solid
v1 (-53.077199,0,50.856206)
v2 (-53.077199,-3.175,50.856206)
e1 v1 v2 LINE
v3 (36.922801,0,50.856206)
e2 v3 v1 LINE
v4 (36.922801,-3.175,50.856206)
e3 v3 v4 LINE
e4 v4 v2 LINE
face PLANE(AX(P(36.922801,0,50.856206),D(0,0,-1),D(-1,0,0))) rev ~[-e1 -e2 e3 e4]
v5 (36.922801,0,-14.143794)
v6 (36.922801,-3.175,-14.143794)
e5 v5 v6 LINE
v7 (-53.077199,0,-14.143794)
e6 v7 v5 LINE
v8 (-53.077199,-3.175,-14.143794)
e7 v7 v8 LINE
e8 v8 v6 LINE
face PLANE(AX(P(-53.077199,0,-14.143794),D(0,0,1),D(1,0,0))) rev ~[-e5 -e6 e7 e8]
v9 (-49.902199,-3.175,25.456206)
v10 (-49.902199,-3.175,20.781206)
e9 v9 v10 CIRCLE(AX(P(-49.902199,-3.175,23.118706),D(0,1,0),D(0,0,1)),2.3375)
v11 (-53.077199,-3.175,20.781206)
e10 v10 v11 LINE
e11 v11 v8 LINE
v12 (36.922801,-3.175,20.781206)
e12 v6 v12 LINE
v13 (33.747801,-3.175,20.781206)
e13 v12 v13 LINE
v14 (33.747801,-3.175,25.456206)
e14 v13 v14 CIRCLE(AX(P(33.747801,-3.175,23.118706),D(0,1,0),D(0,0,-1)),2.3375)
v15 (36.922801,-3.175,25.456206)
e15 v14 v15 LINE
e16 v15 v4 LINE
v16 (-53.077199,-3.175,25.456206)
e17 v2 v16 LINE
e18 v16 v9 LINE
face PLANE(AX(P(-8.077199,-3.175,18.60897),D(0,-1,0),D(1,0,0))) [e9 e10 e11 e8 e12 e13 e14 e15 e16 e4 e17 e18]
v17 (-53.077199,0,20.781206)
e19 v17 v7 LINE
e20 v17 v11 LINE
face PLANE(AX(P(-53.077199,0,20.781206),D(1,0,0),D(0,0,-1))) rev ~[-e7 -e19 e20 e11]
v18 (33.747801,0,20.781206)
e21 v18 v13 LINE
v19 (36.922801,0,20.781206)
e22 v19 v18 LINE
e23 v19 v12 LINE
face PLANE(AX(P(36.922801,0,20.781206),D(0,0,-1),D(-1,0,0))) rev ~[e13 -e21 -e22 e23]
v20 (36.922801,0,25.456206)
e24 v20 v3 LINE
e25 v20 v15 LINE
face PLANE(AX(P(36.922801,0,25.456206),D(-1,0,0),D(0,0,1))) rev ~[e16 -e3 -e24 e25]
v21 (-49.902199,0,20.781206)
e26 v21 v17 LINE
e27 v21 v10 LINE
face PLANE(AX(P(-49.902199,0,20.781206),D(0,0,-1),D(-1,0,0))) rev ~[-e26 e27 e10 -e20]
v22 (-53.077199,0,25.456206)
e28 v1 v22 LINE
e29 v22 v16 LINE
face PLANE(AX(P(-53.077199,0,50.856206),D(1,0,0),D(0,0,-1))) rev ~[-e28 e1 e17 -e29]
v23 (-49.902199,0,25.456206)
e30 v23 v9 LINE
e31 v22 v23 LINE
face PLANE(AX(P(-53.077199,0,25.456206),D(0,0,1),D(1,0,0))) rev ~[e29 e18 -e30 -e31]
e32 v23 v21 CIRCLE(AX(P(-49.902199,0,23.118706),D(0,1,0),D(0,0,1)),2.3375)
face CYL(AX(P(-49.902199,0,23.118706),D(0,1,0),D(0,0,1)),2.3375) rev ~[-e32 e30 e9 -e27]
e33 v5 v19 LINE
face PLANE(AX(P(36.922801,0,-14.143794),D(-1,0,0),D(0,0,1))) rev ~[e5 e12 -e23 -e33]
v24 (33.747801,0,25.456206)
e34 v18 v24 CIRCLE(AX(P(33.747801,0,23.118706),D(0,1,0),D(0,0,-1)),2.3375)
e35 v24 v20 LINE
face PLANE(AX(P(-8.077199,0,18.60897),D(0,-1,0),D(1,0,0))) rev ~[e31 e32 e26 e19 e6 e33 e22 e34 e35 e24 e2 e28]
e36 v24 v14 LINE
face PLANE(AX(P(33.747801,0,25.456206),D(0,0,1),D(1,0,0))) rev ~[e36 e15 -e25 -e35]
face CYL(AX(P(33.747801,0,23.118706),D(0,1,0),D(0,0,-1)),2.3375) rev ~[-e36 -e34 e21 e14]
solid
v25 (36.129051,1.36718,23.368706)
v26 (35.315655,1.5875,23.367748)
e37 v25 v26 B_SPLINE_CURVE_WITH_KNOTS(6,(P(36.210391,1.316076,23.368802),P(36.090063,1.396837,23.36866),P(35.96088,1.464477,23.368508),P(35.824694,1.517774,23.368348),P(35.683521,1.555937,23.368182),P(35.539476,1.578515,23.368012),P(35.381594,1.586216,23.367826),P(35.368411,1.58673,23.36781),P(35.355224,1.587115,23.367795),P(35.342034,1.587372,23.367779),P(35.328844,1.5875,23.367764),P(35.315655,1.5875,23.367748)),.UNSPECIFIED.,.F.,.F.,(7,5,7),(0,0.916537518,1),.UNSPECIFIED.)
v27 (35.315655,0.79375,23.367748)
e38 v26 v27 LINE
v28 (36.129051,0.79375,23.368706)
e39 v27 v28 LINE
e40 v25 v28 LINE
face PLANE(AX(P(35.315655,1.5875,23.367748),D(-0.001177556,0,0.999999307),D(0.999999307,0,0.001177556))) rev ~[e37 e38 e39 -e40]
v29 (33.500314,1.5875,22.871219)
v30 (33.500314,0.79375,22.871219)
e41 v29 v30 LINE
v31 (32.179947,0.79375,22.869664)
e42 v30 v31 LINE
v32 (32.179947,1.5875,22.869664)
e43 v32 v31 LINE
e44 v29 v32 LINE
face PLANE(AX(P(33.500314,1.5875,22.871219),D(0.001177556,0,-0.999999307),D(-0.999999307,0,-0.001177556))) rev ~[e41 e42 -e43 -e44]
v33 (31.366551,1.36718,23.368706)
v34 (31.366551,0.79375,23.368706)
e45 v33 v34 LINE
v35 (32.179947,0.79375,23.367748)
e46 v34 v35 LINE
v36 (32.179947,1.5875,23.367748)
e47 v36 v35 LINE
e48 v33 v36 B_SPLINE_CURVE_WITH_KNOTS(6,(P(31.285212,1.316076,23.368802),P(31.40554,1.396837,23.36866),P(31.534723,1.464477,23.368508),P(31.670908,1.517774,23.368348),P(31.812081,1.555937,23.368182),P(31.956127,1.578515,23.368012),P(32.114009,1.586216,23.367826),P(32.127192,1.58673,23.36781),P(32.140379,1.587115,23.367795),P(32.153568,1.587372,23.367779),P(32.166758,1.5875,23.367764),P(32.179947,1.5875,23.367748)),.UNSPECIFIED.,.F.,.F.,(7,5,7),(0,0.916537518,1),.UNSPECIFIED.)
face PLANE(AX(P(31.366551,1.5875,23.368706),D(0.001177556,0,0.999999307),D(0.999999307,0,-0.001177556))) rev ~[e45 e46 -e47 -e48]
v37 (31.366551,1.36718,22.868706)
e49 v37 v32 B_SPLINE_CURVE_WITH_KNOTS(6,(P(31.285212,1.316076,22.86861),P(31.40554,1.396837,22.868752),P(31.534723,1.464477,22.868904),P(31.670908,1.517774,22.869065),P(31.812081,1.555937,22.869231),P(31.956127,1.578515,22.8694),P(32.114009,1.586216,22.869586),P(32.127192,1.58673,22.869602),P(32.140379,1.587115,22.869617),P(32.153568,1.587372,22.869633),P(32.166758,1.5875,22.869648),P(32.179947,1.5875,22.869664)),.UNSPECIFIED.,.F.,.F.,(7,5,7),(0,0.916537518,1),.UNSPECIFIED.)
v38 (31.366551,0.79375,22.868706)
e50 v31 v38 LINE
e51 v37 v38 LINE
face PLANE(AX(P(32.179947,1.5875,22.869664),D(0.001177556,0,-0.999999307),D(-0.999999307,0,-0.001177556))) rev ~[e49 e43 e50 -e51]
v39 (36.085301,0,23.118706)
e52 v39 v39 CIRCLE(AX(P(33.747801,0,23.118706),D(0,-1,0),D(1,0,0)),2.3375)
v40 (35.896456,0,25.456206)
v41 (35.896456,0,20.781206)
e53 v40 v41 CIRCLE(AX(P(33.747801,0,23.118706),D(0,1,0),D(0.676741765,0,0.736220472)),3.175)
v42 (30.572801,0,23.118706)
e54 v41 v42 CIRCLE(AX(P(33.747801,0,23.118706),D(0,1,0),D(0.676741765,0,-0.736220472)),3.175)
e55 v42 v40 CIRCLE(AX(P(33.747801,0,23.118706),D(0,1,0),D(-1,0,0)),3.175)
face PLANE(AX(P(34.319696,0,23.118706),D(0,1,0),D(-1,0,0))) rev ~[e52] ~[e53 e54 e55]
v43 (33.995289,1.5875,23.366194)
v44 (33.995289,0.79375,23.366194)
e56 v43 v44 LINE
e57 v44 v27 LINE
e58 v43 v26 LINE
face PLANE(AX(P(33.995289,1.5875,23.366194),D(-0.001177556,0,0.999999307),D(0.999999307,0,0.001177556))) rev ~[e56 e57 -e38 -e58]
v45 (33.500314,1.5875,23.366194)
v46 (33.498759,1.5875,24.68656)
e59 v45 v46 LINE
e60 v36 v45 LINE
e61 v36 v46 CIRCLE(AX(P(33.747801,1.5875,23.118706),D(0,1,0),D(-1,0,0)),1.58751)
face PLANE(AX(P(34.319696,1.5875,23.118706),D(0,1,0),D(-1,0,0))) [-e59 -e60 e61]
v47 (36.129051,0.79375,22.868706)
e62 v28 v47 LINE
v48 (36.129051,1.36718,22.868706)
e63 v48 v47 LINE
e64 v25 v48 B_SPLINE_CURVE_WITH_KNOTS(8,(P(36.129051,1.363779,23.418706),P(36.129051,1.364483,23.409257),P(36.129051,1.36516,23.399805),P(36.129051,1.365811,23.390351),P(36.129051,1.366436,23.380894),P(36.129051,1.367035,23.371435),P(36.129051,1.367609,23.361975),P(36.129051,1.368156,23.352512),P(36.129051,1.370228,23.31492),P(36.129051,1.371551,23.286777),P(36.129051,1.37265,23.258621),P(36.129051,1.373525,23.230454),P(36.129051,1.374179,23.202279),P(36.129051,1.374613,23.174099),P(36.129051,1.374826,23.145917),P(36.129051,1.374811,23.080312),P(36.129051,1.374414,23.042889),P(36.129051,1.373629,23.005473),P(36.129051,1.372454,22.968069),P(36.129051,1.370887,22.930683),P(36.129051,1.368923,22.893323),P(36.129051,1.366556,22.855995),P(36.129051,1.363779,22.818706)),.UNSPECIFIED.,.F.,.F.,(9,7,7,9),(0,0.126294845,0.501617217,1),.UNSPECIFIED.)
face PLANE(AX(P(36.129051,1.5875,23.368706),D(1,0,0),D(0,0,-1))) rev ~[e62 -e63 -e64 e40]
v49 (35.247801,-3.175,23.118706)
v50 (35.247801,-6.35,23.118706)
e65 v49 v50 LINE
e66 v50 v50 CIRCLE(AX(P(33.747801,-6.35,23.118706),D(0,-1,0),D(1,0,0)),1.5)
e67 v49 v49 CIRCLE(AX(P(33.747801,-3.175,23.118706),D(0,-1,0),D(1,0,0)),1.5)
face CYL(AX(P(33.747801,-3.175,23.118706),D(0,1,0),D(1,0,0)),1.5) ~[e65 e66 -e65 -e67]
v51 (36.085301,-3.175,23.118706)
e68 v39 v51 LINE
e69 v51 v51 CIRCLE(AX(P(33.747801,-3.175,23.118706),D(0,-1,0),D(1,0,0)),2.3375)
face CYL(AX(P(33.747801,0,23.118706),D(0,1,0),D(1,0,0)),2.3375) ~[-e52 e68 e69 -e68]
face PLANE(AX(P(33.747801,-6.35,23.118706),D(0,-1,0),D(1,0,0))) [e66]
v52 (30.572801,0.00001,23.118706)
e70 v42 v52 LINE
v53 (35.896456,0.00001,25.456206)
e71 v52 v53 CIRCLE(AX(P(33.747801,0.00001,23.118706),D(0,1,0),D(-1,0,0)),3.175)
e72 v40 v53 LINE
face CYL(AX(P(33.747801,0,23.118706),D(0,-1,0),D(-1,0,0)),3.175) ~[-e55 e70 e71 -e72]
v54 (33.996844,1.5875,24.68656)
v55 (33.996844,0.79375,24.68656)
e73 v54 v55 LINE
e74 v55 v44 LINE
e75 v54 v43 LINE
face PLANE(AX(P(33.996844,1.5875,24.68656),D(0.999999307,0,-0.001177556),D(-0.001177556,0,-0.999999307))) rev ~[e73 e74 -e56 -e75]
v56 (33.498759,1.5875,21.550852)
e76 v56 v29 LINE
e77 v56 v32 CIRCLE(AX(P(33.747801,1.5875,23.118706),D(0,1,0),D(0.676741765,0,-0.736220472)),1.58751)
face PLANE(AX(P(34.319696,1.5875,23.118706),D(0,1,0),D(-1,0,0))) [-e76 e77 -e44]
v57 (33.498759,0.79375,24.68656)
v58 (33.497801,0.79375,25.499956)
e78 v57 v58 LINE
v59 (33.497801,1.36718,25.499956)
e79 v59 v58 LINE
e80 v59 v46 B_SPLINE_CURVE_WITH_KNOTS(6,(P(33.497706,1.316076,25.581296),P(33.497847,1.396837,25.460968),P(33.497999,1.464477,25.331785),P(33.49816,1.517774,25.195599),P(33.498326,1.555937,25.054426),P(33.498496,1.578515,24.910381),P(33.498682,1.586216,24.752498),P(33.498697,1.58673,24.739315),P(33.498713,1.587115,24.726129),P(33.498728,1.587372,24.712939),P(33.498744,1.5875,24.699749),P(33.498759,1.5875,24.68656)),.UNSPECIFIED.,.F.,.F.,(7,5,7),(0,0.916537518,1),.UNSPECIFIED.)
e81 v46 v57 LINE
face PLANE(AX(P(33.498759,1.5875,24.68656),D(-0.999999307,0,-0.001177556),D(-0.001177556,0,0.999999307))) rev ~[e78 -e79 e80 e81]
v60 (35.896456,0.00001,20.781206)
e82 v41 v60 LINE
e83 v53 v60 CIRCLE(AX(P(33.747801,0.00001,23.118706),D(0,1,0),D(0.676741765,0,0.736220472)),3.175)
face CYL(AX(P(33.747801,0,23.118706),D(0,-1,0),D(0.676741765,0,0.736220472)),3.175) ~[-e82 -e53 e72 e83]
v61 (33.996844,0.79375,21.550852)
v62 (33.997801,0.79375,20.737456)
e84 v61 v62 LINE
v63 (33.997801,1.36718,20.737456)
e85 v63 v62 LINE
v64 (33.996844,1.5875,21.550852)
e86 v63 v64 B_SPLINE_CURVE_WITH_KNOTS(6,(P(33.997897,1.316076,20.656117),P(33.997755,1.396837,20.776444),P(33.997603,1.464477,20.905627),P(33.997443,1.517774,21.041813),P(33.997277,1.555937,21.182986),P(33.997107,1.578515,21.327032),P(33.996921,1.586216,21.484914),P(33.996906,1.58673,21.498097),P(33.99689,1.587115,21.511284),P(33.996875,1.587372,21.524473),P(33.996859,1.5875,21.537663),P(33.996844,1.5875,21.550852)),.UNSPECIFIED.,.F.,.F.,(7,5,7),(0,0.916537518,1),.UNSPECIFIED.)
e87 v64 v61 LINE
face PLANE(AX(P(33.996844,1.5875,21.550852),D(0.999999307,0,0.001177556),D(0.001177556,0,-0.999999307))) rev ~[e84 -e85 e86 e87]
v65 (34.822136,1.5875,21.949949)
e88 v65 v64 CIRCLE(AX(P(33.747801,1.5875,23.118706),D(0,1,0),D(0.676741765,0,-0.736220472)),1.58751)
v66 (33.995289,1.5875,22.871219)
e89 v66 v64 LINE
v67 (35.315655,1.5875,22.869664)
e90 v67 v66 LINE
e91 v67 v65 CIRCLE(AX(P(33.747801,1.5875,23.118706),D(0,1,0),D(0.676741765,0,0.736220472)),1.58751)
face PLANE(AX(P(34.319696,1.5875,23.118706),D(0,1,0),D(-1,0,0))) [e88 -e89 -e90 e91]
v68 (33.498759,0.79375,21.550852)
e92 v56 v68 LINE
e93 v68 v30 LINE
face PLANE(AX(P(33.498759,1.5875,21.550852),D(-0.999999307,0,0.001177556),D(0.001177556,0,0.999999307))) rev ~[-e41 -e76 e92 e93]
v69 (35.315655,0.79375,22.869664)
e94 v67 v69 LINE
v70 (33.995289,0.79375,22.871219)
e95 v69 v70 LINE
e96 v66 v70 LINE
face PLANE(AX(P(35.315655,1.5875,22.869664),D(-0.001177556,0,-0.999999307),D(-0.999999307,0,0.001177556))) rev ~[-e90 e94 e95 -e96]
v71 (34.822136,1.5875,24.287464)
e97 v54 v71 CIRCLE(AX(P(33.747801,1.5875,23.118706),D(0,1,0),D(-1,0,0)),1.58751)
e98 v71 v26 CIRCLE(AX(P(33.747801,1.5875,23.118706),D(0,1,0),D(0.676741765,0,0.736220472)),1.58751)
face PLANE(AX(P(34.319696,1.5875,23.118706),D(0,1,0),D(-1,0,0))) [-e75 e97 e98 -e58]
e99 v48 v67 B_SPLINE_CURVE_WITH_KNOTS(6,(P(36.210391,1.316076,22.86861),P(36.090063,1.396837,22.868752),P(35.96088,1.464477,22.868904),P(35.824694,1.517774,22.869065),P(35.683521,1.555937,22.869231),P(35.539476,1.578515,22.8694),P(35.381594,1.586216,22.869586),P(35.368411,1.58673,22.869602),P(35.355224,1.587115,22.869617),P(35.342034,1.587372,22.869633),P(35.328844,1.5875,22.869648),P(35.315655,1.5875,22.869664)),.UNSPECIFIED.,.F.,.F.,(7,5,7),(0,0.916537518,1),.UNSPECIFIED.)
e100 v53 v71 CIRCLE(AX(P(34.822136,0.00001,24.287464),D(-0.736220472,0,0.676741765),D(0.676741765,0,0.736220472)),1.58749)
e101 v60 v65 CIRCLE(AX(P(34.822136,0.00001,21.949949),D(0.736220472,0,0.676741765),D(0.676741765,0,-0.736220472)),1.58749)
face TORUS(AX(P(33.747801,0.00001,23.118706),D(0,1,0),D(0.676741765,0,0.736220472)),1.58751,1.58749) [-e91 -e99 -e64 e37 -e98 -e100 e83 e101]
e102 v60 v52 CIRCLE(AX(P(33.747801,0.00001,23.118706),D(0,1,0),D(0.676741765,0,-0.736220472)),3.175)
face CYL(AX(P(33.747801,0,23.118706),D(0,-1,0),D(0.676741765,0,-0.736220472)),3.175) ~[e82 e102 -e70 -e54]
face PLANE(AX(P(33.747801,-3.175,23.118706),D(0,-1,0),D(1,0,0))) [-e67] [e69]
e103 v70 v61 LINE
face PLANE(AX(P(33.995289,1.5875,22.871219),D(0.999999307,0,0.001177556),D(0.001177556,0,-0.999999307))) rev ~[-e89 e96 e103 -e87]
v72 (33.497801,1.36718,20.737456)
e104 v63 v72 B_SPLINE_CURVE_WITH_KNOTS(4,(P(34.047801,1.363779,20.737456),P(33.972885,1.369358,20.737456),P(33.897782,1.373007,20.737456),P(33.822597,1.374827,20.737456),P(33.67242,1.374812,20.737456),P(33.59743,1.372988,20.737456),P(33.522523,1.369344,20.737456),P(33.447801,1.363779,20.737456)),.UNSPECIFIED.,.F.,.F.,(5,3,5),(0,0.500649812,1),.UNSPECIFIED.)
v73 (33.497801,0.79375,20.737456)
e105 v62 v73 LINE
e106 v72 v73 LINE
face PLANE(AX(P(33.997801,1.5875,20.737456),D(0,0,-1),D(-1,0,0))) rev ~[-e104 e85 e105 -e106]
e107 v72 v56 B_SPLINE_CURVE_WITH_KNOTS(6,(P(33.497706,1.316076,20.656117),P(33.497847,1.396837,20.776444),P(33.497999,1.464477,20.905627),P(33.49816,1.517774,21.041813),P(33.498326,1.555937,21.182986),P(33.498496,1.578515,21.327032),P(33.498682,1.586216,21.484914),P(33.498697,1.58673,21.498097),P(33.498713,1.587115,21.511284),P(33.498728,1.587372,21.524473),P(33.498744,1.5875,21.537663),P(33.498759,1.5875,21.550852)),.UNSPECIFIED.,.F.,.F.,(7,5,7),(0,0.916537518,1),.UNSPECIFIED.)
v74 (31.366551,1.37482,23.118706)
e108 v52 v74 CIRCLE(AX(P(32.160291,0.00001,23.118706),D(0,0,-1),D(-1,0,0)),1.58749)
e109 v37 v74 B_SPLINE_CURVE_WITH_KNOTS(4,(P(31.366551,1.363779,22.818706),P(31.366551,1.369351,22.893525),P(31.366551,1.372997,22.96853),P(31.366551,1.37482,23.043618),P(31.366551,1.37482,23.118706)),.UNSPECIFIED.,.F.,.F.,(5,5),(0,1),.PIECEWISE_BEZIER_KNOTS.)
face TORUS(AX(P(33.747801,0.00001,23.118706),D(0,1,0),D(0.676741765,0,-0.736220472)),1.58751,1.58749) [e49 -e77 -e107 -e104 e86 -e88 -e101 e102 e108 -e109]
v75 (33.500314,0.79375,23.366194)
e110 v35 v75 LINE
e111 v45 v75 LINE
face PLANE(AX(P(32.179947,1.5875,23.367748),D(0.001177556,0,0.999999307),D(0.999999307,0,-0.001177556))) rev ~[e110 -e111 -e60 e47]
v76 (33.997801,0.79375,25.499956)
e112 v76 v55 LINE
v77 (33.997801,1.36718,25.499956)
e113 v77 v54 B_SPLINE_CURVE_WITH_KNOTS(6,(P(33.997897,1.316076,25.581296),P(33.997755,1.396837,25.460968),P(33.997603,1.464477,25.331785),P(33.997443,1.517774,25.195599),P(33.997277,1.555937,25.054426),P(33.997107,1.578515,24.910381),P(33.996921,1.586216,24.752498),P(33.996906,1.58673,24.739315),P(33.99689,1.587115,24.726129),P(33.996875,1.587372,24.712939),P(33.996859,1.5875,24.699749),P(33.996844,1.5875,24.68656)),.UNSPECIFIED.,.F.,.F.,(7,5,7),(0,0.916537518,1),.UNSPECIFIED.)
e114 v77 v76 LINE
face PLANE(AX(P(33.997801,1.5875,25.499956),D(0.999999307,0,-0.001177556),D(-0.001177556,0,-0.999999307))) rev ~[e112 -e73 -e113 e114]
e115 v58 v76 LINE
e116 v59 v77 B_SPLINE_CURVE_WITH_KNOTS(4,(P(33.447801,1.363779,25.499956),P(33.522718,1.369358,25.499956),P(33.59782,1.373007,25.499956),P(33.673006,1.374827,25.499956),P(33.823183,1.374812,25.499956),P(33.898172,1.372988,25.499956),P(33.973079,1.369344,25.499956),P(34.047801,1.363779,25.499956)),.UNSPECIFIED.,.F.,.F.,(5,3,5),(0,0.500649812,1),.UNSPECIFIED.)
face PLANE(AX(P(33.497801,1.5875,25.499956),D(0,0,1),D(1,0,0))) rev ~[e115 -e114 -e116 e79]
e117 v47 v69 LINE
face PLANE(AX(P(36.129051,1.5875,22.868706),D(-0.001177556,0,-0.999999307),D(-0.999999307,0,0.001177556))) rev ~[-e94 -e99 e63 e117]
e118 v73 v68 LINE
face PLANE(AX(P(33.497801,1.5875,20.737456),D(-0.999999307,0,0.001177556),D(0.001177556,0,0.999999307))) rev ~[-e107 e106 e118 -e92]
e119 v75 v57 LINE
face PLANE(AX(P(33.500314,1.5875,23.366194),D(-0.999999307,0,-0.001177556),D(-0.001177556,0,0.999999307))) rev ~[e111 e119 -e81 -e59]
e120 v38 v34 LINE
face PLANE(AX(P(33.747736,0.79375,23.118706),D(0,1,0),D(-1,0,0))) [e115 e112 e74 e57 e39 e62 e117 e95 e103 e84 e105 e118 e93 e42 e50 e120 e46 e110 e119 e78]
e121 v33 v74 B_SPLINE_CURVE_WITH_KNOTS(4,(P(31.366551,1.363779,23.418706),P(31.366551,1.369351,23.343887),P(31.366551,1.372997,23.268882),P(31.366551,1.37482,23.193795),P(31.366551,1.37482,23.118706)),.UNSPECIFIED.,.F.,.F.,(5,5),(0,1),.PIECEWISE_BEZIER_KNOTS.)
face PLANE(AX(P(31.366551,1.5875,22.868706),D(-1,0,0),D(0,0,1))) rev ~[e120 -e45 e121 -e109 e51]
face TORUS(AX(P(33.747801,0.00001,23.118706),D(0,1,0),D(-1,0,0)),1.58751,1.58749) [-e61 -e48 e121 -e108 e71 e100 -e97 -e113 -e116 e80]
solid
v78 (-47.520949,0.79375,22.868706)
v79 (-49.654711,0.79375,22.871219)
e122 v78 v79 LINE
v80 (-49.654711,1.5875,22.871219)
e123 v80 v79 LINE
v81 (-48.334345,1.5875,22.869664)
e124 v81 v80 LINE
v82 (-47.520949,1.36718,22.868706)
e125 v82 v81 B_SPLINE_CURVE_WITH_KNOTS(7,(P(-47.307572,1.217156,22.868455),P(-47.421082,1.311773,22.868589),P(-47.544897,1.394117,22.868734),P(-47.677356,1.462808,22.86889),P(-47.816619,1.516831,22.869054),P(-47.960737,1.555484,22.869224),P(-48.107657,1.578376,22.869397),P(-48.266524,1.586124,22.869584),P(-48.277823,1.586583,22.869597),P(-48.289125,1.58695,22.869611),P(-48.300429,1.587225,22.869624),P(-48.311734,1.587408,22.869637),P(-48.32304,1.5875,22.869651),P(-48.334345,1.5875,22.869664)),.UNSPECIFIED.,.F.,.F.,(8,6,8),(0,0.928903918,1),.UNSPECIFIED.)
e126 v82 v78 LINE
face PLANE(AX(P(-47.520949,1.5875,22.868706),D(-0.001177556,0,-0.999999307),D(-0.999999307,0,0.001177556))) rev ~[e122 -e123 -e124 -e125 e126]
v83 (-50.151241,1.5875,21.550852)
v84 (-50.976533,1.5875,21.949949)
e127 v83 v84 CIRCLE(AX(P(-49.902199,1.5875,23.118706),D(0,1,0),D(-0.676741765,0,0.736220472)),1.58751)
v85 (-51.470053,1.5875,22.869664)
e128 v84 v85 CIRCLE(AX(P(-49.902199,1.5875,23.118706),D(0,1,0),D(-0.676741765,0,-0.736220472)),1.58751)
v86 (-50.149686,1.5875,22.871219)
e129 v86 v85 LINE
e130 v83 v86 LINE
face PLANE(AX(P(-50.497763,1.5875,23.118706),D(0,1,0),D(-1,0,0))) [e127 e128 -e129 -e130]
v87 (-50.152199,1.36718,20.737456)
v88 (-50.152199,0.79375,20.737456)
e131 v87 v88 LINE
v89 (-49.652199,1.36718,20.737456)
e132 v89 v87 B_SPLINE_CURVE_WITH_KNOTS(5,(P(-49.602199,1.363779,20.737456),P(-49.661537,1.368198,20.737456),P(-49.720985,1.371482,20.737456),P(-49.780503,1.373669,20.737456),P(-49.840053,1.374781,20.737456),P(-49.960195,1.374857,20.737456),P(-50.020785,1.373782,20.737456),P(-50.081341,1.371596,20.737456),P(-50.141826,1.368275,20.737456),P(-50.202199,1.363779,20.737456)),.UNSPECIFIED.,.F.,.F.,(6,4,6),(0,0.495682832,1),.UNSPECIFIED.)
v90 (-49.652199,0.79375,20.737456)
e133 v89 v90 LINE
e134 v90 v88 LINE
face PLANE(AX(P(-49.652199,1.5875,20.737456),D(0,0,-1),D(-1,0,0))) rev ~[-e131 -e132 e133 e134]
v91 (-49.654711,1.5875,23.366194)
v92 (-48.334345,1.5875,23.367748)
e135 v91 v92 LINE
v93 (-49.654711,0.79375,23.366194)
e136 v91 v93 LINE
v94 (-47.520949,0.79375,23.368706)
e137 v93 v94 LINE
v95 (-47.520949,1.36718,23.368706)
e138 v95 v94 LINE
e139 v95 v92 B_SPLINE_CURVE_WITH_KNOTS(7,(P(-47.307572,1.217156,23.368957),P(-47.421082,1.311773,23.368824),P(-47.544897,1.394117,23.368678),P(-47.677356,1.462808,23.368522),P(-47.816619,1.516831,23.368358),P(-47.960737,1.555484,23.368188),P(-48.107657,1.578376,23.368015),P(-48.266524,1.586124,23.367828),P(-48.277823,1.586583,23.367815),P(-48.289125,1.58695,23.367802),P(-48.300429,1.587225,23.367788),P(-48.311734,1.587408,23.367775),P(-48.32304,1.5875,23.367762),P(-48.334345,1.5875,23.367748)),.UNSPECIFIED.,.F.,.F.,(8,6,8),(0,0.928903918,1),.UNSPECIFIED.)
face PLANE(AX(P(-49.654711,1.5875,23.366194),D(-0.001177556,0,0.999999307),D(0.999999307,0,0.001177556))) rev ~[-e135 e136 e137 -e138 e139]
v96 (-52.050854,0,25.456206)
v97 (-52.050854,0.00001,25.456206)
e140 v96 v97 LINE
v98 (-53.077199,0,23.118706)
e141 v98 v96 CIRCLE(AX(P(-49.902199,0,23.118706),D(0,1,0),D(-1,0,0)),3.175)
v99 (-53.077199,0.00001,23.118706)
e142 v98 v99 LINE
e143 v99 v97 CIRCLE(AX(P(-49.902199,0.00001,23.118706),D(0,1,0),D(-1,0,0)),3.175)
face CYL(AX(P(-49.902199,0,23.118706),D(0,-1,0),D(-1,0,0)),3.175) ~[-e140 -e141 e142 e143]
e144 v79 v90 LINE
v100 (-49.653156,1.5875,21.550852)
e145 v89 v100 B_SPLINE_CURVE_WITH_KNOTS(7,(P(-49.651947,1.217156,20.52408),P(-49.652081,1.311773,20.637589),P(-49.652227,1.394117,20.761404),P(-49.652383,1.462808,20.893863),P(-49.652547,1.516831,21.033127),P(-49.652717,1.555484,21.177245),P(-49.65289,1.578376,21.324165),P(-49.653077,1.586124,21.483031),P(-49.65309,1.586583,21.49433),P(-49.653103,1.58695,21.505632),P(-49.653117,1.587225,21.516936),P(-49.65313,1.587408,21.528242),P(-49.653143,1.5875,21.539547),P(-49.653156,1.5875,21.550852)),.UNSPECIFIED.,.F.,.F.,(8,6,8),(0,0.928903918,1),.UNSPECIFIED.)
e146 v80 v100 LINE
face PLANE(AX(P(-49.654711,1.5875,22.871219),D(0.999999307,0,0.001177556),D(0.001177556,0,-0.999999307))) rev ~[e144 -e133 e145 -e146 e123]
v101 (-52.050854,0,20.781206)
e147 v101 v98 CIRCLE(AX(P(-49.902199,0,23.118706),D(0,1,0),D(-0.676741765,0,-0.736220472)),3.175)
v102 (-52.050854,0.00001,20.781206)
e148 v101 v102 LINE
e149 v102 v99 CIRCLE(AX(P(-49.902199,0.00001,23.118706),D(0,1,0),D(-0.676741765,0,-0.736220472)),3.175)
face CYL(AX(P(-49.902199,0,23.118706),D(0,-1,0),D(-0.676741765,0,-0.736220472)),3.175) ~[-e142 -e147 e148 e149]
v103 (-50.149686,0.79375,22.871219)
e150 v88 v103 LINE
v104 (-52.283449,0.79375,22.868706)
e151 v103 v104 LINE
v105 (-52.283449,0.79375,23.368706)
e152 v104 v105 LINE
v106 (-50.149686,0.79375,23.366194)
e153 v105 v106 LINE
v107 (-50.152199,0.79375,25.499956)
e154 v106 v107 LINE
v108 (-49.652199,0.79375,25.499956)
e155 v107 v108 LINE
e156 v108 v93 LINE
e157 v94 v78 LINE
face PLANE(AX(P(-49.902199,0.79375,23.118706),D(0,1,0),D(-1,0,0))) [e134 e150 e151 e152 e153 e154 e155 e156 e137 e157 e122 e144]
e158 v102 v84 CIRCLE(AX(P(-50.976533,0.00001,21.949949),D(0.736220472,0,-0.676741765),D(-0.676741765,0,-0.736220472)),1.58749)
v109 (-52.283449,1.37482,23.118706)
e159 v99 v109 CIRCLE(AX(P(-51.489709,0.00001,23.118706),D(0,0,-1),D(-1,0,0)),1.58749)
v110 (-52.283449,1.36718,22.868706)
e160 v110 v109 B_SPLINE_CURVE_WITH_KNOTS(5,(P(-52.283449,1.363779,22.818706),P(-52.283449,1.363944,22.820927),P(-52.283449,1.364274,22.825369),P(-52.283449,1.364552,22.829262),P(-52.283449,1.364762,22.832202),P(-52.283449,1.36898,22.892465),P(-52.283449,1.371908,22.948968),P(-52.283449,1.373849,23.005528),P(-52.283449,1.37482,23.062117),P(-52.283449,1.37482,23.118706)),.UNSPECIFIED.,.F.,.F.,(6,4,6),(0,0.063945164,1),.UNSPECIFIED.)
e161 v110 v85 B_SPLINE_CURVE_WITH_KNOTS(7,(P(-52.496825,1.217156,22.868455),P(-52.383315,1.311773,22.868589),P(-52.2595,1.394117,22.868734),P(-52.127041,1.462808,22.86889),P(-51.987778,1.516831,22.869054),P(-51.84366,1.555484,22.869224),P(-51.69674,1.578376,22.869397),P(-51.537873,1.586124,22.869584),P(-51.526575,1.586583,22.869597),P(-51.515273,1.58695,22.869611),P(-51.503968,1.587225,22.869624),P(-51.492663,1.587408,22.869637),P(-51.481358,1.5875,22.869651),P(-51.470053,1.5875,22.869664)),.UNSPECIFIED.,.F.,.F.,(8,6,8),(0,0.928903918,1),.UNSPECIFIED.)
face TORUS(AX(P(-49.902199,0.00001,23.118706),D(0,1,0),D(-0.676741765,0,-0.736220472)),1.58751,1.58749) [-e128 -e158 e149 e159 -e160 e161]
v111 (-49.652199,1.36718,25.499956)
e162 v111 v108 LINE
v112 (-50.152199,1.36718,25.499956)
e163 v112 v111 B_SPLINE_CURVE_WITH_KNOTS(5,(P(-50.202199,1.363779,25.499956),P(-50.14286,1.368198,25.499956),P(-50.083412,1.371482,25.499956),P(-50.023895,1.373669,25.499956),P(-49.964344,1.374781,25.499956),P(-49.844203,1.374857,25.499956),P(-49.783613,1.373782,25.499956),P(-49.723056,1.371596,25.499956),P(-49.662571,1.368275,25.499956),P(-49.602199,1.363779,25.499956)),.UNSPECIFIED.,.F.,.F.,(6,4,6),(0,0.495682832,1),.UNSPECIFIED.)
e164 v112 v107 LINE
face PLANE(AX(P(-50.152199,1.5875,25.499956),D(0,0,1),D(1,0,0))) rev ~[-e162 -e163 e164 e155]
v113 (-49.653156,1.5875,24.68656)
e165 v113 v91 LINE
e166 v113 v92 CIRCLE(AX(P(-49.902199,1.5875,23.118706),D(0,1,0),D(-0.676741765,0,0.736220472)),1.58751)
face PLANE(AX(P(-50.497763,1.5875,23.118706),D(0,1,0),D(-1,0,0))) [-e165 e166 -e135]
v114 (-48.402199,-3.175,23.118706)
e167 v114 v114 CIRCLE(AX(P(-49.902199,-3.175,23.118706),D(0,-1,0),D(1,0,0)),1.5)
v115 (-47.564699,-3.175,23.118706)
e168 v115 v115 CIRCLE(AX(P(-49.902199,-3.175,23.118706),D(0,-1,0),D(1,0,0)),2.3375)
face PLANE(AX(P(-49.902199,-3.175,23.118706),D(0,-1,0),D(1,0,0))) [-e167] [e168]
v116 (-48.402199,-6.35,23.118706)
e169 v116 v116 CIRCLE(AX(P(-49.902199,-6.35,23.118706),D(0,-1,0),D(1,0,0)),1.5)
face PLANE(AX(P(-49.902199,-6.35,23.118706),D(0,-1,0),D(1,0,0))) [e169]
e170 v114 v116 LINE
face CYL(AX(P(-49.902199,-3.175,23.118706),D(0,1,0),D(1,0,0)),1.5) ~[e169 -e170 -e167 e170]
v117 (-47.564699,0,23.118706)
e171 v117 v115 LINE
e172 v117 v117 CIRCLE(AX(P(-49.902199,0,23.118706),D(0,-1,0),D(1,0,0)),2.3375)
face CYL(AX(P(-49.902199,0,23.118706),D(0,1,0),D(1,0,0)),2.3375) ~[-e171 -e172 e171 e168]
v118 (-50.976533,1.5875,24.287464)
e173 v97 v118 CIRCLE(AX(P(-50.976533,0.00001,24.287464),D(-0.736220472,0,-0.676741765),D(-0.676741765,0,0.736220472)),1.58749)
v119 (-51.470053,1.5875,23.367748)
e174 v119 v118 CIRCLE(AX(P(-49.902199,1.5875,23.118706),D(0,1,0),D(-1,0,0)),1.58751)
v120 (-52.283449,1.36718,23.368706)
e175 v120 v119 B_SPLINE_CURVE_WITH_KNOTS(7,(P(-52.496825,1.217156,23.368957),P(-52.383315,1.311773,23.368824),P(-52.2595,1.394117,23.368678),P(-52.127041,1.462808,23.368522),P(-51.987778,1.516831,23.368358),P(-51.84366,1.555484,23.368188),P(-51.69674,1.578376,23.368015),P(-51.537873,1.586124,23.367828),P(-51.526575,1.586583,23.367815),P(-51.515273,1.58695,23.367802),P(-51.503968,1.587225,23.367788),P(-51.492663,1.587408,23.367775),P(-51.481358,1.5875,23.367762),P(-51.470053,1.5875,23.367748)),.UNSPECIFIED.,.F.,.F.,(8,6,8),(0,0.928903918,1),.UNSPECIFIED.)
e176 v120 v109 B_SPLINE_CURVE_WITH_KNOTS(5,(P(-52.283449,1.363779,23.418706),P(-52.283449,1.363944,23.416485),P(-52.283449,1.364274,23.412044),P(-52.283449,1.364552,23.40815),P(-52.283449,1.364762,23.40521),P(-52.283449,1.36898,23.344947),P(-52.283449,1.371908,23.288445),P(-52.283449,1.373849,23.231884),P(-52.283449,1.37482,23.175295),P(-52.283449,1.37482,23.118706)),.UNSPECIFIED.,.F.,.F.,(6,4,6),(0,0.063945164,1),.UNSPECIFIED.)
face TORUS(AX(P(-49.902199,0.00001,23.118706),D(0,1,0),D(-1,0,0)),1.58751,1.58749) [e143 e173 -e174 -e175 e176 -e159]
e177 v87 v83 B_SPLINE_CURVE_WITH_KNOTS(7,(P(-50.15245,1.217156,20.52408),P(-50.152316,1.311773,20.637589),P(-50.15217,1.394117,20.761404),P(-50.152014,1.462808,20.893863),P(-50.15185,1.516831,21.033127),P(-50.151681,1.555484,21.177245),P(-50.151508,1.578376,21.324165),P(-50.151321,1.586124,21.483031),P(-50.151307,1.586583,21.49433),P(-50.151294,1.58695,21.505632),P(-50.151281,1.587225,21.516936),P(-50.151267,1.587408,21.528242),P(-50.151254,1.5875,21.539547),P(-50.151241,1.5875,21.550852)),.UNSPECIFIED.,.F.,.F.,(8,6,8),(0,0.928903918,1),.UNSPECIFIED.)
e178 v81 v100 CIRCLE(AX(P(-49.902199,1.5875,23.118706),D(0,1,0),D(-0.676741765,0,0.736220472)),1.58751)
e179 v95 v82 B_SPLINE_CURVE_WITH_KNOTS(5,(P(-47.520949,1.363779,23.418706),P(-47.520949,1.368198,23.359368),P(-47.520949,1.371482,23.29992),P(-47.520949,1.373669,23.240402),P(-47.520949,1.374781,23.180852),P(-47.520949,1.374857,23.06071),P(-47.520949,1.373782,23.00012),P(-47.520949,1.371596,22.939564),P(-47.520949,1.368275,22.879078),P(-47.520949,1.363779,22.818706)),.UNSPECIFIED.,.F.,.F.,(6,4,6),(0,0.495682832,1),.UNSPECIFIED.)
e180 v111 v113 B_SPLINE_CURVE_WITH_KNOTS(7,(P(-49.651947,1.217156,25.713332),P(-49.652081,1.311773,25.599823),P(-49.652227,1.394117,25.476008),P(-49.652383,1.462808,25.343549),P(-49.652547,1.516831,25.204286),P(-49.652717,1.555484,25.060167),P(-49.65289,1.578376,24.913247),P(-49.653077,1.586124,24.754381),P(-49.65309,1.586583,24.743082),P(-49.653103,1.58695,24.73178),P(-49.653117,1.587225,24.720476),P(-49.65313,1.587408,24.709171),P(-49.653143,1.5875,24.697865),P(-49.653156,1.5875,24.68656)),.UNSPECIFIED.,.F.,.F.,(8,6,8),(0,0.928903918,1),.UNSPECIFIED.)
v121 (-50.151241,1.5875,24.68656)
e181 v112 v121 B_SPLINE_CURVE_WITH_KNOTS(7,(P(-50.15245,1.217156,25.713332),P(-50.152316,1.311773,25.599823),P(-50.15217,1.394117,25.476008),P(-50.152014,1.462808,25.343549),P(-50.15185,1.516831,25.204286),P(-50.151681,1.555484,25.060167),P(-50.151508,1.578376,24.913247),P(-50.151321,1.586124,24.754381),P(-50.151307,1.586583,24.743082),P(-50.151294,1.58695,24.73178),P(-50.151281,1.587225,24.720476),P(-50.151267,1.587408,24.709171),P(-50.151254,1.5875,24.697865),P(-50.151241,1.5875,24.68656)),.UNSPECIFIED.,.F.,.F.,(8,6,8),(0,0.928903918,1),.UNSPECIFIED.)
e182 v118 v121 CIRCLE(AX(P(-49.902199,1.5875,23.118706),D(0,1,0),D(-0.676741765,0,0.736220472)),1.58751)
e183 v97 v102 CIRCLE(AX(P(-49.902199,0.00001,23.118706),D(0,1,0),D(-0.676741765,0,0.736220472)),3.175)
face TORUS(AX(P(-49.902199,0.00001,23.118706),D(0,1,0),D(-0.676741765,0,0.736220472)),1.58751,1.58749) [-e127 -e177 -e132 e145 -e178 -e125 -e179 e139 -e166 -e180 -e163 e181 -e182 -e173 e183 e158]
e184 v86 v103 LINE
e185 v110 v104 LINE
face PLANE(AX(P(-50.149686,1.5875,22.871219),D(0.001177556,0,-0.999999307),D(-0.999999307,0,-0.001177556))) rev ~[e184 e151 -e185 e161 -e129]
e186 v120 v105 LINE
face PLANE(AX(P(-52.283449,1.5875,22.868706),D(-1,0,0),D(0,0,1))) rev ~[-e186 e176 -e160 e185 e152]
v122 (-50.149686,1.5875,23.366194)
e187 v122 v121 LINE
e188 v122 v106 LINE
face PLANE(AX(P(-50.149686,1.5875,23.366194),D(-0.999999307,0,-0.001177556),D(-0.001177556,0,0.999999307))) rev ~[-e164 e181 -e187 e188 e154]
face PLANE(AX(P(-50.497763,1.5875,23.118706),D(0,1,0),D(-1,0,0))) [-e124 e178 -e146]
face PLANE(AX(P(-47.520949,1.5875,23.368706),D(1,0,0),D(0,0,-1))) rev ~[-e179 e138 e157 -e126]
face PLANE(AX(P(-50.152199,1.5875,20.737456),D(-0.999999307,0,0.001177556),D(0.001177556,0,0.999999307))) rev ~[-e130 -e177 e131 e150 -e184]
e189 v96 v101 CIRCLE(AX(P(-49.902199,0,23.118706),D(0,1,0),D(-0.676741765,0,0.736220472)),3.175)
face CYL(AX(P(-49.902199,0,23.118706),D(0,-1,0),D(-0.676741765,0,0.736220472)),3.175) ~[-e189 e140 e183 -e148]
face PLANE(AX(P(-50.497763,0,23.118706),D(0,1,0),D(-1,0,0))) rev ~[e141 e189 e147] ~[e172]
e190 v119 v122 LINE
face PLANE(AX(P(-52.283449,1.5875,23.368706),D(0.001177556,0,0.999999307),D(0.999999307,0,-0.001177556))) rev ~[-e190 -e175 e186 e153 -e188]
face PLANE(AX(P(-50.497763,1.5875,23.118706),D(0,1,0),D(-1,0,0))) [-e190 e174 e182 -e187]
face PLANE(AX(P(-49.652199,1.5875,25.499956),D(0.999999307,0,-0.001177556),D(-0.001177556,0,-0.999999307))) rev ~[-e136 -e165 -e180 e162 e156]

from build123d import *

# Parameters (mm, degrees)
F1_DEPTH  = 3.175
F3_DEPTH  = 1.5875
F4_R      = 1.58749
F4_2_R    = 1.58749
F6_DEPTH  = 0.79375
F8_R      = 2.3375
F9_DEPTH  = 3.175
F7_R      = 2.3375
F11_R     = 1.5
F12_DEPTH = 3.175
F10_R     = 1.5


# Not quite as in the source:
# - a fillet or chamfer is up to 0.001 mm smaller than in the source, because OpenCascade refuses the exact size


with BuildPart() as f1:
    # F0 (on Front) → F1 (new body)
    with BuildSketch(Plane.XZ):
        with BuildLine():
            Line((36.9228013605, 50.8562061697), (-53.0771986395, 50.8562061697))
            Line((-53.0771986395, 50.8562061697), (-53.0771986395, 25.4562061697))
            Line((-53.0771986395, 25.4562061697), (-49.9021986395, 25.4562061697))
            ThreePointArc((-49.9021986395, 25.4562061697), (-47.5646986395, 23.1187061697), (-49.9021986395, 20.7812061697))
            Line((-49.9021986395, 20.7812061697), (-53.0771986395, 20.7812061697))
            Line((-53.0771986395, 20.7812061697), (-53.0771986395, -14.1437938303))
            Line((-53.0771986395, -14.1437938303), (36.9228013605, -14.1437938303))
            Line((36.9228013605, -14.1437938303), (36.9228013605, 20.7812061697))
            Line((36.9228013605, 20.7812061697), (33.7478013605, 20.7812061697))
            ThreePointArc((33.7478013605, 20.7812061697), (31.4103013605, 23.1187061697), (33.7478013605, 25.4562061697))
            Line((33.7478013605, 25.4562061697), (36.9228013605, 25.4562061697))
            Line((36.9228013605, 25.4562061697), (36.9228013605, 50.8562061697))
        make_face()
    extrude(amount=F1_DEPTH)


with BuildPart() as f3:
    # F2 (on face) → F3 (new body)
    with BuildSketch(Plane(origin=(0, 0, 0), x_dir=(-1, 0, 0), z_dir=(0, 1, 0))):
        with BuildLine():
            Line((-33.7478013605, 25.4562061697), (-35.8964564631, 25.4562061697))
            ThreePointArc((-35.8964564631, 25.4562061697), (-36.9228013605, 23.1187061697), (-35.8964564631, 20.7812061697))
            Line((-35.8964564631, 20.7812061697), (-33.7478013605, 20.7812061697))
            ThreePointArc((-33.7478013605, 20.7812061697), (-31.4103013605, 23.1187061697), (-33.7478013605, 25.4562061697))
        make_face()
        with BuildLine():
            ThreePointArc((-35.8964564631, 20.7812061697), (-32.4713521744, 20.211593775), (-30.5728013605, 23.1187061697))
            ThreePointArc((-30.5728013605, 23.1187061697), (-32.4713521744, 26.0258185644), (-35.8964564631, 25.4562061697))
            Line((-35.8964564631, 25.4562061697), (-33.7478013605, 25.4562061697))
            ThreePointArc((-33.7478013605, 25.4562061697), (-31.4103013605, 23.1187061697), (-33.7478013605, 20.7812061697))
            Line((-33.7478013605, 20.7812061697), (-35.8964564631, 20.7812061697))
        make_face()
    extrude(amount=F3_DEPTH)

    # F4 (radius 1.5875 in the source; OpenCascade refuses exactly that, so slightly less here)
    f4_edges = [f3.edges().sort_by_distance(p)[0] for p in [
        (31.599146, 1.5875, 25.456206),
    ]]
    fillet(f4_edges, radius=F4_R)


with BuildPart() as f3b:
    # F2 (on face) → F3, piece 2 (new body)
    with BuildSketch(Plane(origin=(0, 0, 0), x_dir=(-1, 0, 0), z_dir=(0, 1, 0))):
        with BuildLine():
            ThreePointArc((53.0771986395, 23.1187061697), (52.8093110342, 24.3951553557), (52.0508537421, 25.4562061697))
            Line((52.0508537421, 25.4562061697), (49.9021986395, 25.4562061697))
            ThreePointArc((49.9021986395, 25.4562061697), (47.5646986395, 23.1187061697), (49.9021986395, 20.7812061697))
            Line((49.9021986395, 20.7812061697), (52.0508537421, 20.7812061697))
            ThreePointArc((52.0508537421, 20.7812061697), (52.8093110342, 21.8422569836), (53.0771986395, 23.1187061697))
        make_face()
        with BuildLine():
            Line((49.9021986395, 25.4562061697), (52.0508537421, 25.4562061697))
            ThreePointArc((52.0508537421, 25.4562061697), (46.7271986395, 23.1187061697), (52.0508537421, 20.7812061697))
            Line((52.0508537421, 20.7812061697), (49.9021986395, 20.7812061697))
            ThreePointArc((49.9021986395, 20.7812061697), (47.5646986395, 23.1187061697), (49.9021986395, 25.4562061697))
        make_face()
    extrude(amount=F3_DEPTH)

    # F4#2 (radius 1.5875 in the source; OpenCascade refuses exactly that, so slightly less here)
    f4_2_edges = [f3b.edges().sort_by_distance(p)[0] for p in [
        (-46.727199, 1.5875, 23.118706),
    ]]
    fillet(f4_2_edges, radius=F4_2_R)


with BuildPart() as f6_tool:
    # F5 (on face) → F6 (new body)
    with BuildSketch(Plane(origin=(0, 1.5875, 0), x_dir=(-1, 0, 0), z_dir=(0, 1, 0))):
        with BuildLine():
            Line((-33.5003139871, 23.3661935431), (-33.4987591805, 24.6865601146))
            ThreePointArc((-33.4987591805, 24.6865601146), (-33.7478013605, 24.7062161697), (-33.9968435405, 24.6865601146))
            Line((-33.9968435405, 24.6865601146), (-33.9952887339, 23.3661935431))
            Line((-33.9952887339, 23.3661935431), (-35.3156553054, 23.3677483496))
            ThreePointArc((-35.3156553054, 23.3677483496), (-35.3353113605, 23.1187061697), (-35.3156553054, 22.8696639897))
            Line((-35.3156553054, 22.8696639897), (-33.9952887339, 22.8712187962))
            Line((-33.9952887339, 22.8712187962), (-33.9968435405, 21.5508522247))
            ThreePointArc((-33.9968435405, 21.5508522247), (-33.7478013605, 21.5311961697), (-33.4987591805, 21.5508522247))
            Line((-33.4987591805, 21.5508522247), (-33.5003139871, 22.8712187962))
            Line((-33.5003139871, 22.8712187962), (-32.1799474155, 22.8696639897))
            ThreePointArc((-32.1799474155, 22.8696639897), (-32.1652130034, 22.9937978354), (-32.1602913605, 23.1187061697))
            ThreePointArc((-32.1602913605, 23.1187061697), (-32.1652130034, 23.243614504), (-32.1799474155, 23.3677483496))
            Line((-32.1799474155, 23.3677483496), (-33.5003139871, 23.3661935431))
        make_face()
        with BuildLine():
            Line((-33.4978013605, 25.4999561697), (-33.7478013605, 25.4999561697))
            Line((-33.7478013605, 25.4999561697), (-33.9978013605, 25.4999561697))
            Line((-33.9978013605, 25.4999561697), (-33.9968435405, 24.6865601146))
            ThreePointArc((-33.9968435405, 24.6865601146), (-33.7478013605, 24.7062161697), (-33.4987591805, 24.6865601146))
            Line((-33.4987591805, 24.6865601146), (-33.4978013605, 25.4999561697))
        make_face()
        with BuildLine():
            Line((-31.3665513605, 23.3687061697), (-32.1799474155, 23.3677483496))
            ThreePointArc((-32.1799474155, 23.3677483496), (-32.1652130034, 23.243614504), (-32.1602913605, 23.1187061697))
            ThreePointArc((-32.1602913605, 23.1187061697), (-32.1652130034, 22.9937978354), (-32.1799474155, 22.8696639897))
            Line((-32.1799474155, 22.8696639897), (-31.3665513605, 22.8687061697))
            Line((-31.3665513605, 22.8687061697), (-31.3665513605, 23.1187061697))
            Line((-31.3665513605, 23.1187061697), (-31.3665513605, 23.3687061697))
        make_face()
        with BuildLine():
            ThreePointArc((-33.4987591805, 21.5508522247), (-33.7478013605, 21.5311961697), (-33.9968435405, 21.5508522247))
            Line((-33.9968435405, 21.5508522247), (-33.9978013605, 20.7374561697))
            Line((-33.9978013605, 20.7374561697), (-33.7478013605, 20.7374561697))
            Line((-33.7478013605, 20.7374561697), (-33.4978013605, 20.7374561697))
            Line((-33.4978013605, 20.7374561697), (-33.4987591805, 21.5508522247))
        make_face()
        with BuildLine():
            ThreePointArc((-35.3156553054, 22.8696639897), (-35.3353113605, 23.1187061697), (-35.3156553054, 23.3677483496))
            Line((-35.3156553054, 23.3677483496), (-36.1290513605, 23.3687061697))
            Line((-36.1290513605, 23.3687061697), (-36.1290513605, 23.1187061697))
            Line((-36.1290513605, 23.1187061697), (-36.1290513605, 22.8687061697))
            Line((-36.1290513605, 22.8687061697), (-35.3156553054, 22.8696639897))
        make_face()
        Polygon((49.6521986395, 20.7374561697), (49.9021986395, 20.7374561697), (50.1521986395, 20.7374561697), (50.1496860129, 22.8712187962), (52.2834486395, 22.8687061697), (52.2834486395, 23.1187061697), (52.2834486395, 23.3687061697), (50.1496860129, 23.3661935431), (50.1521986395, 25.4999561697), (49.9021986395, 25.4999561697), (49.6521986395, 25.4999561697), (49.6547112661, 23.3661935431), (47.5209486395, 23.3687061697), (47.5209486395, 23.1187061697), (47.5209486395, 22.8687061697), (49.6547112661, 22.8712187962), align=None)
    extrude(amount=-F6_DEPTH)


with BuildPart() as f3_1:
    add(f3.part)

    # F6: cut by f6_tool
    add(f6_tool.part, mode=Mode.SUBTRACT)

    # F7 (on face) → F9, piece 2 (join, through all)
    with BuildSketch(Plane.XZ):
        with Locations((33.7478013605, 23.1187061697)):
            Circle(F7_R)
    extrude(amount=F9_DEPTH)

    # F10 (on face) → F12, piece 2 (join)
    with BuildSketch(Plane.XZ.offset(3.175)):
        with Locations((33.7478013605, 23.1187061697)):
            Circle(F10_R)
    extrude(amount=F12_DEPTH)


with BuildPart() as f3b_1:
    add(f3b.part)

    # F6: cut by f6_tool
    add(f6_tool.part, mode=Mode.SUBTRACT)

    # F8 (on face) → F9 (join, through all)
    with BuildSketch(Plane.XZ):
        with Locations((-49.9021986395, 23.1187061697)):
            Circle(F8_R)
    extrude(amount=F9_DEPTH)

    # F11 (on face) → F12 (join)
    with BuildSketch(Plane.XZ.offset(3.175)):
        with Locations((-49.9021986395, 23.1187061697)):
            Circle(F11_R)
    extrude(amount=F12_DEPTH)


solid = Compound([f1.part, f3_1.part, f3b_1.part])
